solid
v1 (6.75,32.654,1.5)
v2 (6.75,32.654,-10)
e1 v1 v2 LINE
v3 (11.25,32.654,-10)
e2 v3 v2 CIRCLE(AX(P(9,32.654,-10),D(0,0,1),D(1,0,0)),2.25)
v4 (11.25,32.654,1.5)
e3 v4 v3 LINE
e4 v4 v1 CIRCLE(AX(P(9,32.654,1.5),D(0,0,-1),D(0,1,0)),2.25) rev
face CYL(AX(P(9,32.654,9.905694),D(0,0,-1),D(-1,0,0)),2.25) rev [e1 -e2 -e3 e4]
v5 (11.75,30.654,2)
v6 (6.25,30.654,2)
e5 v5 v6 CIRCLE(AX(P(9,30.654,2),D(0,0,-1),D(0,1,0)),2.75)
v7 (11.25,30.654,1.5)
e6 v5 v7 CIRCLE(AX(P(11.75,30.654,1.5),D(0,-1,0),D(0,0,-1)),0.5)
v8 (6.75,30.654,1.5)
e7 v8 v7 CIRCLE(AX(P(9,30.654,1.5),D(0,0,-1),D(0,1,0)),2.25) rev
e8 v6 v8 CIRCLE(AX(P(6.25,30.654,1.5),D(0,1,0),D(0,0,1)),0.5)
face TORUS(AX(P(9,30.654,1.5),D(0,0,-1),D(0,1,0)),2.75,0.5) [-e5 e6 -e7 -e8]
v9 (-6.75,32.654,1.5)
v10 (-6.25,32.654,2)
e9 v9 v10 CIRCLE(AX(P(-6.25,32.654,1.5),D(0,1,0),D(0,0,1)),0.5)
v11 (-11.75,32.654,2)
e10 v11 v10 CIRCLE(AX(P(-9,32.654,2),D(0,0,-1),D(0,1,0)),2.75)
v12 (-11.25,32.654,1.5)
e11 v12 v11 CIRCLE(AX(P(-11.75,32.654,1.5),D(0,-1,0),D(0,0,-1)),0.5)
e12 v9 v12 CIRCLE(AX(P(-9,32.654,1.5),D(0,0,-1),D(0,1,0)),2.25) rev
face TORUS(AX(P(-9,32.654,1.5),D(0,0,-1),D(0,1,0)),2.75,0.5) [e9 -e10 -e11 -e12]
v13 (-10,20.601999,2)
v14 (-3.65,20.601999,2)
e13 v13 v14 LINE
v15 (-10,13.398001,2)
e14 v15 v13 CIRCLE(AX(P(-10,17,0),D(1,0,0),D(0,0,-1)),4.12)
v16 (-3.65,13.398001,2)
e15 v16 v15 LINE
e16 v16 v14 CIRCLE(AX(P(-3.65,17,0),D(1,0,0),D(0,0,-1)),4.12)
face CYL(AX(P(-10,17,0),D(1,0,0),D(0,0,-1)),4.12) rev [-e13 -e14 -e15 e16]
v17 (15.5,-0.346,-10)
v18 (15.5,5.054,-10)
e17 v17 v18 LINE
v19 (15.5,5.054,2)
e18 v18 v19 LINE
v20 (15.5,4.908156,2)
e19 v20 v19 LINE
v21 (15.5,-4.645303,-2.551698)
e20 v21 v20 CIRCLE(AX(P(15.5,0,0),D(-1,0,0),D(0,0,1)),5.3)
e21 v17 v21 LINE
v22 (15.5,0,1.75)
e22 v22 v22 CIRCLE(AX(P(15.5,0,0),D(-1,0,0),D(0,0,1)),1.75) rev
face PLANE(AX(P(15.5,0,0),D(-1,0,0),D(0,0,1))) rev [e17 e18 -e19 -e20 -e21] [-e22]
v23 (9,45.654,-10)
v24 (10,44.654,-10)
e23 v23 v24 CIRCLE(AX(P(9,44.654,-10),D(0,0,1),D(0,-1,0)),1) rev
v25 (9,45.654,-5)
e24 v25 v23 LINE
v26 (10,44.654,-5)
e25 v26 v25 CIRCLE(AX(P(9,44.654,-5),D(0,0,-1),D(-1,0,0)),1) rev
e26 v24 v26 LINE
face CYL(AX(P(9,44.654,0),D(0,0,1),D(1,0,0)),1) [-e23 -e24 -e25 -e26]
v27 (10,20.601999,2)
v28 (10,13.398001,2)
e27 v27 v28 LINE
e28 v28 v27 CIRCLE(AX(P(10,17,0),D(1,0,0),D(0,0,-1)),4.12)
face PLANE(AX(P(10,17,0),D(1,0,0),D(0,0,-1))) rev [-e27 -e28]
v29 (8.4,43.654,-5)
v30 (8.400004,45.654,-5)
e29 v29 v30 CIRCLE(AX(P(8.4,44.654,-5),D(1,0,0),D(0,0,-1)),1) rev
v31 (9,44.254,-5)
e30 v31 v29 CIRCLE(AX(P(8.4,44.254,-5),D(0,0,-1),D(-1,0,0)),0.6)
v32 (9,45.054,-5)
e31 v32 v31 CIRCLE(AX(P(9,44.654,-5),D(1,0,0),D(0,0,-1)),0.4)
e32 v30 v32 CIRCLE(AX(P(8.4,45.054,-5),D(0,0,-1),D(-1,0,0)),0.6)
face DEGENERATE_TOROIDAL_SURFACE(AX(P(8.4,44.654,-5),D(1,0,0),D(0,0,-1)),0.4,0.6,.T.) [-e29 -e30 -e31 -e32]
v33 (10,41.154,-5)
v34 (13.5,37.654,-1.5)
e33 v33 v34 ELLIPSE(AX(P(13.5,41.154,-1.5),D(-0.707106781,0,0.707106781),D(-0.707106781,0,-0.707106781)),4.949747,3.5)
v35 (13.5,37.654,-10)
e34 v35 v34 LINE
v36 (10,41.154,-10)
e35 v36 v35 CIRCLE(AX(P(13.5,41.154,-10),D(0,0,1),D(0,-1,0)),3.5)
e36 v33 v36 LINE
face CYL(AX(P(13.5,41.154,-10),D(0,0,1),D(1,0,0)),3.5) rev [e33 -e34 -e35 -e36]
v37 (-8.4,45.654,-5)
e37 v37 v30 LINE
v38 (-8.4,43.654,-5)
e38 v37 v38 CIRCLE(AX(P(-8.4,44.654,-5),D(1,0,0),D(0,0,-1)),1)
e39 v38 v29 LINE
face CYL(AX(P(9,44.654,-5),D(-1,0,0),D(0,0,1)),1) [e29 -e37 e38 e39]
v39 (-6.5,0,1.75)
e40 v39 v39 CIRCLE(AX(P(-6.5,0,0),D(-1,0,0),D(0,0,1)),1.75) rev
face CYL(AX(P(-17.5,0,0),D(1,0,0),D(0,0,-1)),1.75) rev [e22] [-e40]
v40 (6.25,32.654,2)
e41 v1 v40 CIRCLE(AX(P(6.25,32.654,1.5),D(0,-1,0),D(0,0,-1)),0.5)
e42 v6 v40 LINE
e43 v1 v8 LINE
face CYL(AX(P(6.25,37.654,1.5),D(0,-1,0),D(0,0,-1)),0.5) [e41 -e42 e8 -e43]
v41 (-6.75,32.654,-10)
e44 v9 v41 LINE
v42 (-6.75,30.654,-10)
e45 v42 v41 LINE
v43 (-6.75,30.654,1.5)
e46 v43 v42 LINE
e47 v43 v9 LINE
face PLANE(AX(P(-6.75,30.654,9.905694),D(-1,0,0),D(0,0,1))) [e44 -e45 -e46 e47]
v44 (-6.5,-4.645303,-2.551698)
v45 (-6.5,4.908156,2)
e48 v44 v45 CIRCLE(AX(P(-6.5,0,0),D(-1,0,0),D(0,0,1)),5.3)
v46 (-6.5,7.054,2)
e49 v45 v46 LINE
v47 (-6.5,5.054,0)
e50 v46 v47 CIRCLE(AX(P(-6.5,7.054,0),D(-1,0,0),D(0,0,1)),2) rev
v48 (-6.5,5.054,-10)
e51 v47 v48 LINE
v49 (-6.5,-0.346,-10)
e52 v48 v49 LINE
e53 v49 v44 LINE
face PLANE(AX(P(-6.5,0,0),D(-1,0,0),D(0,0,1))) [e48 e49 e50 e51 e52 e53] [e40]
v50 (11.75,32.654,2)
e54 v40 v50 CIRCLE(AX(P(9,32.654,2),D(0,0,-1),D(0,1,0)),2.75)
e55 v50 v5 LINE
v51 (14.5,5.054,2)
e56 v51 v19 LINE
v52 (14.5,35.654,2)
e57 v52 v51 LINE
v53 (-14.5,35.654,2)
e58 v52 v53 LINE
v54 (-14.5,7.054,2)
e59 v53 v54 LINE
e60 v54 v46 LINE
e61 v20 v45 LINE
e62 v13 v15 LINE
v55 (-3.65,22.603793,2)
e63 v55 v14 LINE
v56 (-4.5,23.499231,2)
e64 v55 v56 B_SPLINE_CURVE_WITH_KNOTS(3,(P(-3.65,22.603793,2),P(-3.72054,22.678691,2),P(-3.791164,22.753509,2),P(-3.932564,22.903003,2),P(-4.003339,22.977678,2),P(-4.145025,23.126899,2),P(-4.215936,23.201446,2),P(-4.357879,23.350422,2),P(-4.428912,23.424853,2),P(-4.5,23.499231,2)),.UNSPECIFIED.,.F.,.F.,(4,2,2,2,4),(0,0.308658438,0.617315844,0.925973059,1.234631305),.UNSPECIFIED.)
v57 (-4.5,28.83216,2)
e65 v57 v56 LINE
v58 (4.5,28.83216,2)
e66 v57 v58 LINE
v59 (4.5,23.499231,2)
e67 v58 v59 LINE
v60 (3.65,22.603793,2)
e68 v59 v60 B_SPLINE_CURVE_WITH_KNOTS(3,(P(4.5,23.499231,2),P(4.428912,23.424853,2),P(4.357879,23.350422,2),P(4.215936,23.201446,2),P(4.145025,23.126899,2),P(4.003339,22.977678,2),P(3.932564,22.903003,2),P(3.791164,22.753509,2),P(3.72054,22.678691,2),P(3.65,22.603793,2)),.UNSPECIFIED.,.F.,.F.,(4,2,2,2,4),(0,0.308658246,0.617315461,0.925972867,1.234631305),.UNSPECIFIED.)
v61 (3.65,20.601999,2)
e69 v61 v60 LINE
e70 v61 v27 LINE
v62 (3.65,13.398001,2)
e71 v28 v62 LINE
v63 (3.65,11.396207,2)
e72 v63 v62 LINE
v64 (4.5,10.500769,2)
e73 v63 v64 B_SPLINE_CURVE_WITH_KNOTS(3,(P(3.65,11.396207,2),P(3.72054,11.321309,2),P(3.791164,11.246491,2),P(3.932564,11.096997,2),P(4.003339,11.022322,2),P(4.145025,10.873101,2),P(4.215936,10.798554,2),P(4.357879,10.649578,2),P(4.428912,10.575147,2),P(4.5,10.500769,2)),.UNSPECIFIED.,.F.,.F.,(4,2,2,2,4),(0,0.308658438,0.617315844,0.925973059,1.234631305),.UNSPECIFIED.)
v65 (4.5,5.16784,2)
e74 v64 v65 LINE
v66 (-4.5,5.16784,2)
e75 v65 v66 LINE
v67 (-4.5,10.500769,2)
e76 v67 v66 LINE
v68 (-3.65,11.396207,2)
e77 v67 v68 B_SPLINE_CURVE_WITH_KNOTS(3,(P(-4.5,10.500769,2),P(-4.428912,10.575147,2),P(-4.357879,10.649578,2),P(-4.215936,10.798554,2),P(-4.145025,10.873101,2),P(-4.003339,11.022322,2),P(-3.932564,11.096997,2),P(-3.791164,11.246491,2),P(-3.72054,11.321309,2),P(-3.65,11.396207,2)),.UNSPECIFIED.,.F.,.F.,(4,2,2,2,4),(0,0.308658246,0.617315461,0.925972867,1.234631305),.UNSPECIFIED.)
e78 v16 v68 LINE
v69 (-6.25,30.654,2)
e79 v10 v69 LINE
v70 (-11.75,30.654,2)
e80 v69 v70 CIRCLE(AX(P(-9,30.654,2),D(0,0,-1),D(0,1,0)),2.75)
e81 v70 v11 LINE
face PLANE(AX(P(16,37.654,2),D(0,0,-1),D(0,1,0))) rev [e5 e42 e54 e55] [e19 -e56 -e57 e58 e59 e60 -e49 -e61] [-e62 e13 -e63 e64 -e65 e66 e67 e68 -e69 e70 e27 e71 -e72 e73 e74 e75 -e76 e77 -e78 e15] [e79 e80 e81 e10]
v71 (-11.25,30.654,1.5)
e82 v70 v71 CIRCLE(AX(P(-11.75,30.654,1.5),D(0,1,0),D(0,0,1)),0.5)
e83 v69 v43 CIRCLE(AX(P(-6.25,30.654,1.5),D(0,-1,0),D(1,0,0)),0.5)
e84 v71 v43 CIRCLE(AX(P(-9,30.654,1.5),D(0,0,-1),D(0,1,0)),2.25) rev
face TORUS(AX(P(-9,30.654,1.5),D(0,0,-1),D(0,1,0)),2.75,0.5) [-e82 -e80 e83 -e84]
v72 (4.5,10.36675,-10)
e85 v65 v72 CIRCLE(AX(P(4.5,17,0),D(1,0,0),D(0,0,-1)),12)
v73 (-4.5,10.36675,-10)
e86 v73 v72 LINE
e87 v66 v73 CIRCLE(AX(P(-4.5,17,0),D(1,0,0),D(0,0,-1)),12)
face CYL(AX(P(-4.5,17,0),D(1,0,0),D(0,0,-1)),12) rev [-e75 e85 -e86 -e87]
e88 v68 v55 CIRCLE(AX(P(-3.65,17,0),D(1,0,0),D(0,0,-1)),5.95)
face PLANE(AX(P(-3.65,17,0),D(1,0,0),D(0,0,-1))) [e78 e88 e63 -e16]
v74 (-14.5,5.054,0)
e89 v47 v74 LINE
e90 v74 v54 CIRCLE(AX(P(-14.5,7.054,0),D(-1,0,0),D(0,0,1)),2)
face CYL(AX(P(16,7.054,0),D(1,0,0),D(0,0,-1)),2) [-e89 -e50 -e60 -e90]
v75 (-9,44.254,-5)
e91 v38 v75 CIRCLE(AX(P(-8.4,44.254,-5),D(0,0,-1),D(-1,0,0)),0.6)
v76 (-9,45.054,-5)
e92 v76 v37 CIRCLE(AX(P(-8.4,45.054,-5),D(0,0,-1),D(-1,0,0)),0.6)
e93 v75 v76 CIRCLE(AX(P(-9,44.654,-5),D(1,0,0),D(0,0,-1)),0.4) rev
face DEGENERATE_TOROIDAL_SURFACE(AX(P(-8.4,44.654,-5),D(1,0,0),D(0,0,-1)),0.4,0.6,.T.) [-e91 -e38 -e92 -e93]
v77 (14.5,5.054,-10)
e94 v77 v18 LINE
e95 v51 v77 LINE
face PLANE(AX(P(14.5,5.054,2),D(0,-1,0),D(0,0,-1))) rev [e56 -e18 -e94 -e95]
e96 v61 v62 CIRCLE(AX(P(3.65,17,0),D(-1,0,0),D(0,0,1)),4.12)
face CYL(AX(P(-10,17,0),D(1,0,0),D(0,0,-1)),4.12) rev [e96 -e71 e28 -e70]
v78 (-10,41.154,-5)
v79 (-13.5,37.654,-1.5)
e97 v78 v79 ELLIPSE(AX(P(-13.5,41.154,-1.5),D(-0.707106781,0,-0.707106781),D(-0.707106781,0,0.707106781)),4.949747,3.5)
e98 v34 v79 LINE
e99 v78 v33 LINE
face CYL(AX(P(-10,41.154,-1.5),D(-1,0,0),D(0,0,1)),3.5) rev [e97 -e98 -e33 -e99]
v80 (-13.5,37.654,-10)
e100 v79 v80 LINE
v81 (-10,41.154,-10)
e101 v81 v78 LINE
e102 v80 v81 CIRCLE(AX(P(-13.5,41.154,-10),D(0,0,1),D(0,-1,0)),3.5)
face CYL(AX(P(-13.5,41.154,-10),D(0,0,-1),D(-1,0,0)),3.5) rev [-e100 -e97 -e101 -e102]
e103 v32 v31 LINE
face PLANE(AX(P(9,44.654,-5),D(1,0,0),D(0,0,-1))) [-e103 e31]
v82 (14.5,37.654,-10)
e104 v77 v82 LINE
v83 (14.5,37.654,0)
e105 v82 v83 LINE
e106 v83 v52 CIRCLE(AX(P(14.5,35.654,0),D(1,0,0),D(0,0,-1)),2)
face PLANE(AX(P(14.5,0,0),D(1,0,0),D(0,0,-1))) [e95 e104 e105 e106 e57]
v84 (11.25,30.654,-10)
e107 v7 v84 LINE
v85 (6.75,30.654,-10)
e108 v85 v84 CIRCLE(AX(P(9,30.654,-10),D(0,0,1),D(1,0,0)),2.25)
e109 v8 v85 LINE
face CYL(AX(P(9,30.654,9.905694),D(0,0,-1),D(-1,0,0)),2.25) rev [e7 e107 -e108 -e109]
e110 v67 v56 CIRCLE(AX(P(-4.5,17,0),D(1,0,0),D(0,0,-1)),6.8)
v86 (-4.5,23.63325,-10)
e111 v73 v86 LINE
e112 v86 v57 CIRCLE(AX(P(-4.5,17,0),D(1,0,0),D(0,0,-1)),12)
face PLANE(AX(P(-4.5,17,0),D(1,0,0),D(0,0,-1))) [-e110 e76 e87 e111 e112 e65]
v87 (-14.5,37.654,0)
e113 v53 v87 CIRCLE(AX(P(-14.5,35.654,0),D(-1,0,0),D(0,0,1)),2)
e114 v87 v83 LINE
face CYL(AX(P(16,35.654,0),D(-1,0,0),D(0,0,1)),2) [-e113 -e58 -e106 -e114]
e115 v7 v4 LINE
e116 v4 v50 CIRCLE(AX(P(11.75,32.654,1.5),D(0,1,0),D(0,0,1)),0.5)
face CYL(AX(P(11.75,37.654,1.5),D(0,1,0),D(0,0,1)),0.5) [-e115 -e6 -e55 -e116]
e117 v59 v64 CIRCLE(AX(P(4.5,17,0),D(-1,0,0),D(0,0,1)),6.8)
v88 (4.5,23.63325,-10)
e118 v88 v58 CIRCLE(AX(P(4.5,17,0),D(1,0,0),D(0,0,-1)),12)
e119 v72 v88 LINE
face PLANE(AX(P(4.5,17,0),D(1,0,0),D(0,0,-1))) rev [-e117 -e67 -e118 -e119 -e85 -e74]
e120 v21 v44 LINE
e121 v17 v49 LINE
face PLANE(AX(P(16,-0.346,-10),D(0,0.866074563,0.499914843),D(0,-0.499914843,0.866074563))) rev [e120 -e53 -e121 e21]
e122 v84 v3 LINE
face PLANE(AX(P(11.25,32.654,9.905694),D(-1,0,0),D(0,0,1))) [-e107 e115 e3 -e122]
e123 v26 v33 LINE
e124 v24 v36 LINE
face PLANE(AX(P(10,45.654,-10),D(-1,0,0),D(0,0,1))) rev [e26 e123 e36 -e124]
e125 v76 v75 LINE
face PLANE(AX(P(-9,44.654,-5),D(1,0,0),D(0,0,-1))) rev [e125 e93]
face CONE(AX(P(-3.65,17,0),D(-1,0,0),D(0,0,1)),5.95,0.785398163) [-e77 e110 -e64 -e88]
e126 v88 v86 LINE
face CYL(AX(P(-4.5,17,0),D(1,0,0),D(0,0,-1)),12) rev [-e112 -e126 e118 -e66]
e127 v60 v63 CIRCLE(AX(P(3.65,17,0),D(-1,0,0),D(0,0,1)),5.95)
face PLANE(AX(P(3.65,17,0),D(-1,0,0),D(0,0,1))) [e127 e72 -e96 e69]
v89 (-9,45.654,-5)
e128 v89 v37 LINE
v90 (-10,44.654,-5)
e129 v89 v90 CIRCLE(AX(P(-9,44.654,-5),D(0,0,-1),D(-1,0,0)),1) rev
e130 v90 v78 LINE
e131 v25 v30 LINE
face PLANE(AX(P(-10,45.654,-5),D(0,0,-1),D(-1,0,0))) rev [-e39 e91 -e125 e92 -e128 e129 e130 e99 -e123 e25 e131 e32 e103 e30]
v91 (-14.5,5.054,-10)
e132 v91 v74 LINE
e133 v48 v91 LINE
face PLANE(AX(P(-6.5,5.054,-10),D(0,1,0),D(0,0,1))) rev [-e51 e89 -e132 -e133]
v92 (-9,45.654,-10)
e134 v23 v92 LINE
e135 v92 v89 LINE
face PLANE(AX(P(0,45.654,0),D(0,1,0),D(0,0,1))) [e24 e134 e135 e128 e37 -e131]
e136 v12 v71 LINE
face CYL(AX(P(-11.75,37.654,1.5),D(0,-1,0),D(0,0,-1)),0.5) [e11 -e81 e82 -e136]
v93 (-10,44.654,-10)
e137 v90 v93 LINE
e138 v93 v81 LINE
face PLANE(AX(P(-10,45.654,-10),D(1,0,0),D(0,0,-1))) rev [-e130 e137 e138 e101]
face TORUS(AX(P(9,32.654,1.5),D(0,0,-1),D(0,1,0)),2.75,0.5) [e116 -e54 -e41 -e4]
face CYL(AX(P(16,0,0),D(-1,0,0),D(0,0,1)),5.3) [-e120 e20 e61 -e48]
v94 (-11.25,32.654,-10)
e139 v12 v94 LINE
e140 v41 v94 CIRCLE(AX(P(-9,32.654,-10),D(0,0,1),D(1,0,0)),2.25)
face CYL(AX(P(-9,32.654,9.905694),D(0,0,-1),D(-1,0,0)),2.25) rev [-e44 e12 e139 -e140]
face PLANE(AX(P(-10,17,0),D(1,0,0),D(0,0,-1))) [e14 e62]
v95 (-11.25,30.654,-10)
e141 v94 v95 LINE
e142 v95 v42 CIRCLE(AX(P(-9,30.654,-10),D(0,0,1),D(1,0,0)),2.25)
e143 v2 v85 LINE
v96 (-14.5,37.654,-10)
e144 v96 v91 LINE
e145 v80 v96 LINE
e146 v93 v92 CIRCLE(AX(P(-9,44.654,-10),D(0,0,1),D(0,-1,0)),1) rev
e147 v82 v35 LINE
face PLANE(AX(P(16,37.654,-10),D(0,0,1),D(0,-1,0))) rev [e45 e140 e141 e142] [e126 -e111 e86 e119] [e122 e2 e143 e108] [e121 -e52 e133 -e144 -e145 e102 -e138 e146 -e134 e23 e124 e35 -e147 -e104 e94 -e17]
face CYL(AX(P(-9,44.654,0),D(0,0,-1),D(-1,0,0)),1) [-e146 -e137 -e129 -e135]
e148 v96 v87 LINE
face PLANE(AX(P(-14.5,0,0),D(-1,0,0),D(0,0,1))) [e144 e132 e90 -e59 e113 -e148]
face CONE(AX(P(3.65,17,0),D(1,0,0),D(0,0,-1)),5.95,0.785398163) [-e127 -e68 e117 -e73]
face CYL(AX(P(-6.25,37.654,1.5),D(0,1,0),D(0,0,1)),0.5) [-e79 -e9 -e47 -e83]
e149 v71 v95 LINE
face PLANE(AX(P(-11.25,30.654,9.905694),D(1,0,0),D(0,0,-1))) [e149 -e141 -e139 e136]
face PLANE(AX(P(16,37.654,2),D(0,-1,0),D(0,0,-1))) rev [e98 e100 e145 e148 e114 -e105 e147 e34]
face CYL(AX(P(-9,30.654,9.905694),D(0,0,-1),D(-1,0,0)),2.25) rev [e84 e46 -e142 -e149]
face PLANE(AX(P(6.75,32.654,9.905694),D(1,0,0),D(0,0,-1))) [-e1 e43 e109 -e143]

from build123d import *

# Parameters (mm, degrees)
BOSS_EXTRUDE1_DEPTH = 16
SKETCH2_R           = 12
CUT_EXTRUDE1_DEPTH  = 4.5
SKETCH6_R           = 1.75
CUT_EXTRUDE4_DEPTH  = 17.5
BOSS_EXTRUDE2_DEPTH = 0.85
BOSS_EXTRUDE3_START = 0.85
BOSS_EXTRUDE3_DEPTH = 0.85
SKETCH3_R           = 4.12
BEARING_AXIS_DEPTH  = 10
CHAMFER1_SIZE       = 0.85
SKETCH15_W          = 20
SKETCH15_H          = 5
BOSS_EXTRUDE4_DEPTH = 8
FILLET1_R           = 3.5
FILLET3_R           = 1
SKETCH16_R          = 1
BOSS_EXTRUDE5_DEPTH = 9
FILLET4_R           = 0.6
CUT_EXTRUDE8_DEPTH  = 12
FILLET6_R           = 0.5
SKETCH19_W          = 12
SKETCH19_H          = 32.6
CUT_EXTRUDE9_DEPTH  = 1.5
SKETCH20_W          = 12
SKETCH20_H          = 32.6
CUT_EXTRUDE10_DEPTH = 1.5
SKETCH21_W          = 16.964448298
SKETCH21_H          = 10.992811929
CUT_EXTRUDE11_DEPTH = 9.5
SKETCH22_W          = 17.37165941
SKETCH22_H          = 11.278055293
CUT_EXTRUDE12_DEPTH = 0.5
FILLET7_R           = 2


with BuildPart() as part:
    # Sketch1 → Boss-Extrude1 (new, symmetric)
    with BuildSketch(Plane(origin=(0, 0, 0), x_dir=(0, 0, -1), z_dir=(1, 0, 0))):
        with BuildLine():
            Line((10, -0.346), (2.551698211, -4.645302599))
            ThreePointArc((2.551698211, -4.645302599), (-4.784687849, -2.279640803), (-2, 4.908156477))
            Line((-2, 4.908156477), (-2, 37.654))
            Line((-2, 37.654), (10, 37.654))
            Line((10, 37.654), (10, -0.346))
        make_face()
    extrude(amount=BOSS_EXTRUDE1_DEPTH, both=True)

    # Sketch2 → Cut-Extrude1 (cut, symmetric)
    with BuildSketch(Plane(origin=(0, 0, 0), x_dir=(0, 0, -1), z_dir=(1, 0, 0))):
        with Locations((0, 17)):
            Circle(SKETCH2_R)
    extrude(amount=CUT_EXTRUDE1_DEPTH, both=True, mode=Mode.SUBTRACT)

    # Sketch6 → Cut-Extrude4 (cut, symmetric)
    with BuildSketch(Plane(origin=(0, 0, 0), x_dir=(0, 0, -1), z_dir=(1, 0, 0))):
        Circle(SKETCH6_R)
    extrude(amount=CUT_EXTRUDE4_DEPTH, both=True, mode=Mode.SUBTRACT)

    # Sketch8 → Boss-Extrude2 (add)
    with BuildSketch(Plane(origin=(-4.5, 0, 0), x_dir=(0, 0, -1), z_dir=(1, 0, 0))):
        with BuildLine():
            Line((-2, 23.499230724), (-2, 10.500769276))
            ThreePointArc((-2, 10.500769276), (6.8, 17), (-2, 23.499230724))
        make_face()
    extrude(amount=BOSS_EXTRUDE2_DEPTH)

    # Sketch9 → Boss-Extrude3 (add)
    with BuildSketch(Plane.ZY.offset(-4.5).offset(BOSS_EXTRUDE3_START)):
        with BuildLine():
            Line((2, 23.499230724), (2, 10.500769276))
            ThreePointArc((2, 10.500769276), (-6.8, 17), (2, 23.499230724))
        make_face()
    extrude(amount=-BOSS_EXTRUDE3_DEPTH)

    # Sketch3 → bearing_axis (cut, symmetric)
    with BuildSketch(Plane(origin=(0, 0, 0), x_dir=(0, 0, -1), z_dir=(1, 0, 0))):
        with Locations((0, 17)):
            Circle(SKETCH3_R)
    extrude(amount=BEARING_AXIS_DEPTH, both=True, mode=Mode.SUBTRACT)

    # Chamfer1
    chamfer1_edges = [part.edges().sort_by_distance(p)[0] for p in [
        (3.65, 17, -6.8),
        (-3.65, 17, -6.8),
    ]]
    chamfer(chamfer1_edges, length=CHAMFER1_SIZE - 0.0001)  # a hair under: the kernel refuses the full size

    # Sketch15 → Boss-Extrude4 (add)
    with BuildSketch(Plane(origin=(0, 37.654, 0), x_dir=(1, 0, 0), z_dir=(0, 1, 0))):
        with Locations((0, 7.5)):
            Rectangle(SKETCH15_W, SKETCH15_H)
    extrude(amount=BOSS_EXTRUDE4_DEPTH)

    # Fillet1
    fillet1_edges = [part.edges().sort_by_distance(p)[0] for p in [
        (0, 37.654, -5),
        (10, 37.654, -7.5),
        (-10, 37.654, -7.5),
    ]]
    fillet(fillet1_edges, radius=FILLET1_R)

    # Fillet3
    fillet3_edges = [part.edges().sort_by_distance(p)[0] for p in [
        (-10, 45.654, -7.5),
        (10, 45.654, -7.5),
    ]]
    fillet(fillet3_edges, radius=FILLET3_R)

    # Sketch16 → Boss-Extrude5 (add, symmetric)
    with BuildSketch(Plane(origin=(0, 0, 0), x_dir=(0, 0, -1), z_dir=(1, 0, 0))):
        with Locations((5, 44.654)):
            Circle(SKETCH16_R)
    extrude(amount=BOSS_EXTRUDE5_DEPTH, both=True)

    # Fillet4
    fillet4_edges = [part.edges().sort_by_distance(p)[0] for p in [
        (-9, 44.654, -4),
        (9, 44.654, -4),
    ]]
    fillet(fillet4_edges, radius=FILLET4_R)

    # Sketch18 → Cut-Extrude8 (cut)
    with BuildSketch(Plane.XY.offset(-10)):
        with BuildLine():
            Line((-11.25, 30.654), (-11.25, 32.654))
            ThreePointArc((-11.25, 32.654), (-9, 34.904), (-6.75, 32.654))
            Line((-6.75, 32.654), (-6.75, 30.654))
            ThreePointArc((-6.75, 30.654), (-9, 28.404), (-11.25, 30.654))
        make_face()
        with BuildLine():
            Line((11.25, 32.654), (11.25, 30.654))
            ThreePointArc((11.25, 30.654), (9, 28.404), (6.75, 30.654))
            Line((6.75, 30.654), (6.75, 32.654))
            ThreePointArc((6.75, 32.654), (9, 34.904), (11.25, 32.654))
        make_face()
    extrude(amount=CUT_EXTRUDE8_DEPTH, mode=Mode.SUBTRACT)

    # Fillet6
    fillet6_edges = [part.edges().sort_by_distance(p)[0] for p in [
        (-11.25, 31.654, 2),
        (-9, 34.904, 2),
        (-6.75, 31.654, 2),
        (-9, 28.404, 2),
        (11.25, 31.654, 2),
        (9, 28.404, 2),
        (6.75, 31.654, 2),
        (9, 34.904, 2),
    ]]
    fillet(fillet6_edges, radius=FILLET6_R)

    # Sketch19 → Cut-Extrude9 (cut)
    with BuildSketch(Plane(origin=(16, 0, 0), x_dir=(0, 0, -1), z_dir=(1, 0, 0))):
        with Locations((4, 21.354)):
            Rectangle(SKETCH19_W, SKETCH19_H)
    extrude(amount=-CUT_EXTRUDE9_DEPTH, mode=Mode.SUBTRACT)

    # Sketch20 → Cut-Extrude10 (cut)
    with BuildSketch(Plane.ZY.offset(16)):
        with Locations((-4, 21.354)):
            Rectangle(SKETCH20_W, SKETCH20_H)
    extrude(amount=-CUT_EXTRUDE10_DEPTH, mode=Mode.SUBTRACT)

    # Sketch21 → Cut-Extrude11 (cut)
    with BuildSketch(Plane.ZY.offset(16)):
        with Locations((-1.517775851, -0.442405965)):
            Rectangle(SKETCH21_W, SKETCH21_H)
    extrude(amount=-CUT_EXTRUDE11_DEPTH, mode=Mode.SUBTRACT)

    # Sketch22 → Cut-Extrude12 (cut)
    with BuildSketch(Plane(origin=(16, 0, 0), x_dir=(0, 0, -1), z_dir=(1, 0, 0))):
        with Locations((1.314170295, -0.585027646)):
            Rectangle(SKETCH22_W, SKETCH22_H)
    extrude(amount=-CUT_EXTRUDE12_DEPTH, mode=Mode.SUBTRACT)

    # Fillet7
    fillet7_edges = [part.edges().sort_by_distance(p)[0] for p in [
        (0, 37.654, 2),
        (-10.5, 5.054, 2),
    ]]
    fillet(fillet7_edges, radius=FILLET7_R)


solid = part.part
